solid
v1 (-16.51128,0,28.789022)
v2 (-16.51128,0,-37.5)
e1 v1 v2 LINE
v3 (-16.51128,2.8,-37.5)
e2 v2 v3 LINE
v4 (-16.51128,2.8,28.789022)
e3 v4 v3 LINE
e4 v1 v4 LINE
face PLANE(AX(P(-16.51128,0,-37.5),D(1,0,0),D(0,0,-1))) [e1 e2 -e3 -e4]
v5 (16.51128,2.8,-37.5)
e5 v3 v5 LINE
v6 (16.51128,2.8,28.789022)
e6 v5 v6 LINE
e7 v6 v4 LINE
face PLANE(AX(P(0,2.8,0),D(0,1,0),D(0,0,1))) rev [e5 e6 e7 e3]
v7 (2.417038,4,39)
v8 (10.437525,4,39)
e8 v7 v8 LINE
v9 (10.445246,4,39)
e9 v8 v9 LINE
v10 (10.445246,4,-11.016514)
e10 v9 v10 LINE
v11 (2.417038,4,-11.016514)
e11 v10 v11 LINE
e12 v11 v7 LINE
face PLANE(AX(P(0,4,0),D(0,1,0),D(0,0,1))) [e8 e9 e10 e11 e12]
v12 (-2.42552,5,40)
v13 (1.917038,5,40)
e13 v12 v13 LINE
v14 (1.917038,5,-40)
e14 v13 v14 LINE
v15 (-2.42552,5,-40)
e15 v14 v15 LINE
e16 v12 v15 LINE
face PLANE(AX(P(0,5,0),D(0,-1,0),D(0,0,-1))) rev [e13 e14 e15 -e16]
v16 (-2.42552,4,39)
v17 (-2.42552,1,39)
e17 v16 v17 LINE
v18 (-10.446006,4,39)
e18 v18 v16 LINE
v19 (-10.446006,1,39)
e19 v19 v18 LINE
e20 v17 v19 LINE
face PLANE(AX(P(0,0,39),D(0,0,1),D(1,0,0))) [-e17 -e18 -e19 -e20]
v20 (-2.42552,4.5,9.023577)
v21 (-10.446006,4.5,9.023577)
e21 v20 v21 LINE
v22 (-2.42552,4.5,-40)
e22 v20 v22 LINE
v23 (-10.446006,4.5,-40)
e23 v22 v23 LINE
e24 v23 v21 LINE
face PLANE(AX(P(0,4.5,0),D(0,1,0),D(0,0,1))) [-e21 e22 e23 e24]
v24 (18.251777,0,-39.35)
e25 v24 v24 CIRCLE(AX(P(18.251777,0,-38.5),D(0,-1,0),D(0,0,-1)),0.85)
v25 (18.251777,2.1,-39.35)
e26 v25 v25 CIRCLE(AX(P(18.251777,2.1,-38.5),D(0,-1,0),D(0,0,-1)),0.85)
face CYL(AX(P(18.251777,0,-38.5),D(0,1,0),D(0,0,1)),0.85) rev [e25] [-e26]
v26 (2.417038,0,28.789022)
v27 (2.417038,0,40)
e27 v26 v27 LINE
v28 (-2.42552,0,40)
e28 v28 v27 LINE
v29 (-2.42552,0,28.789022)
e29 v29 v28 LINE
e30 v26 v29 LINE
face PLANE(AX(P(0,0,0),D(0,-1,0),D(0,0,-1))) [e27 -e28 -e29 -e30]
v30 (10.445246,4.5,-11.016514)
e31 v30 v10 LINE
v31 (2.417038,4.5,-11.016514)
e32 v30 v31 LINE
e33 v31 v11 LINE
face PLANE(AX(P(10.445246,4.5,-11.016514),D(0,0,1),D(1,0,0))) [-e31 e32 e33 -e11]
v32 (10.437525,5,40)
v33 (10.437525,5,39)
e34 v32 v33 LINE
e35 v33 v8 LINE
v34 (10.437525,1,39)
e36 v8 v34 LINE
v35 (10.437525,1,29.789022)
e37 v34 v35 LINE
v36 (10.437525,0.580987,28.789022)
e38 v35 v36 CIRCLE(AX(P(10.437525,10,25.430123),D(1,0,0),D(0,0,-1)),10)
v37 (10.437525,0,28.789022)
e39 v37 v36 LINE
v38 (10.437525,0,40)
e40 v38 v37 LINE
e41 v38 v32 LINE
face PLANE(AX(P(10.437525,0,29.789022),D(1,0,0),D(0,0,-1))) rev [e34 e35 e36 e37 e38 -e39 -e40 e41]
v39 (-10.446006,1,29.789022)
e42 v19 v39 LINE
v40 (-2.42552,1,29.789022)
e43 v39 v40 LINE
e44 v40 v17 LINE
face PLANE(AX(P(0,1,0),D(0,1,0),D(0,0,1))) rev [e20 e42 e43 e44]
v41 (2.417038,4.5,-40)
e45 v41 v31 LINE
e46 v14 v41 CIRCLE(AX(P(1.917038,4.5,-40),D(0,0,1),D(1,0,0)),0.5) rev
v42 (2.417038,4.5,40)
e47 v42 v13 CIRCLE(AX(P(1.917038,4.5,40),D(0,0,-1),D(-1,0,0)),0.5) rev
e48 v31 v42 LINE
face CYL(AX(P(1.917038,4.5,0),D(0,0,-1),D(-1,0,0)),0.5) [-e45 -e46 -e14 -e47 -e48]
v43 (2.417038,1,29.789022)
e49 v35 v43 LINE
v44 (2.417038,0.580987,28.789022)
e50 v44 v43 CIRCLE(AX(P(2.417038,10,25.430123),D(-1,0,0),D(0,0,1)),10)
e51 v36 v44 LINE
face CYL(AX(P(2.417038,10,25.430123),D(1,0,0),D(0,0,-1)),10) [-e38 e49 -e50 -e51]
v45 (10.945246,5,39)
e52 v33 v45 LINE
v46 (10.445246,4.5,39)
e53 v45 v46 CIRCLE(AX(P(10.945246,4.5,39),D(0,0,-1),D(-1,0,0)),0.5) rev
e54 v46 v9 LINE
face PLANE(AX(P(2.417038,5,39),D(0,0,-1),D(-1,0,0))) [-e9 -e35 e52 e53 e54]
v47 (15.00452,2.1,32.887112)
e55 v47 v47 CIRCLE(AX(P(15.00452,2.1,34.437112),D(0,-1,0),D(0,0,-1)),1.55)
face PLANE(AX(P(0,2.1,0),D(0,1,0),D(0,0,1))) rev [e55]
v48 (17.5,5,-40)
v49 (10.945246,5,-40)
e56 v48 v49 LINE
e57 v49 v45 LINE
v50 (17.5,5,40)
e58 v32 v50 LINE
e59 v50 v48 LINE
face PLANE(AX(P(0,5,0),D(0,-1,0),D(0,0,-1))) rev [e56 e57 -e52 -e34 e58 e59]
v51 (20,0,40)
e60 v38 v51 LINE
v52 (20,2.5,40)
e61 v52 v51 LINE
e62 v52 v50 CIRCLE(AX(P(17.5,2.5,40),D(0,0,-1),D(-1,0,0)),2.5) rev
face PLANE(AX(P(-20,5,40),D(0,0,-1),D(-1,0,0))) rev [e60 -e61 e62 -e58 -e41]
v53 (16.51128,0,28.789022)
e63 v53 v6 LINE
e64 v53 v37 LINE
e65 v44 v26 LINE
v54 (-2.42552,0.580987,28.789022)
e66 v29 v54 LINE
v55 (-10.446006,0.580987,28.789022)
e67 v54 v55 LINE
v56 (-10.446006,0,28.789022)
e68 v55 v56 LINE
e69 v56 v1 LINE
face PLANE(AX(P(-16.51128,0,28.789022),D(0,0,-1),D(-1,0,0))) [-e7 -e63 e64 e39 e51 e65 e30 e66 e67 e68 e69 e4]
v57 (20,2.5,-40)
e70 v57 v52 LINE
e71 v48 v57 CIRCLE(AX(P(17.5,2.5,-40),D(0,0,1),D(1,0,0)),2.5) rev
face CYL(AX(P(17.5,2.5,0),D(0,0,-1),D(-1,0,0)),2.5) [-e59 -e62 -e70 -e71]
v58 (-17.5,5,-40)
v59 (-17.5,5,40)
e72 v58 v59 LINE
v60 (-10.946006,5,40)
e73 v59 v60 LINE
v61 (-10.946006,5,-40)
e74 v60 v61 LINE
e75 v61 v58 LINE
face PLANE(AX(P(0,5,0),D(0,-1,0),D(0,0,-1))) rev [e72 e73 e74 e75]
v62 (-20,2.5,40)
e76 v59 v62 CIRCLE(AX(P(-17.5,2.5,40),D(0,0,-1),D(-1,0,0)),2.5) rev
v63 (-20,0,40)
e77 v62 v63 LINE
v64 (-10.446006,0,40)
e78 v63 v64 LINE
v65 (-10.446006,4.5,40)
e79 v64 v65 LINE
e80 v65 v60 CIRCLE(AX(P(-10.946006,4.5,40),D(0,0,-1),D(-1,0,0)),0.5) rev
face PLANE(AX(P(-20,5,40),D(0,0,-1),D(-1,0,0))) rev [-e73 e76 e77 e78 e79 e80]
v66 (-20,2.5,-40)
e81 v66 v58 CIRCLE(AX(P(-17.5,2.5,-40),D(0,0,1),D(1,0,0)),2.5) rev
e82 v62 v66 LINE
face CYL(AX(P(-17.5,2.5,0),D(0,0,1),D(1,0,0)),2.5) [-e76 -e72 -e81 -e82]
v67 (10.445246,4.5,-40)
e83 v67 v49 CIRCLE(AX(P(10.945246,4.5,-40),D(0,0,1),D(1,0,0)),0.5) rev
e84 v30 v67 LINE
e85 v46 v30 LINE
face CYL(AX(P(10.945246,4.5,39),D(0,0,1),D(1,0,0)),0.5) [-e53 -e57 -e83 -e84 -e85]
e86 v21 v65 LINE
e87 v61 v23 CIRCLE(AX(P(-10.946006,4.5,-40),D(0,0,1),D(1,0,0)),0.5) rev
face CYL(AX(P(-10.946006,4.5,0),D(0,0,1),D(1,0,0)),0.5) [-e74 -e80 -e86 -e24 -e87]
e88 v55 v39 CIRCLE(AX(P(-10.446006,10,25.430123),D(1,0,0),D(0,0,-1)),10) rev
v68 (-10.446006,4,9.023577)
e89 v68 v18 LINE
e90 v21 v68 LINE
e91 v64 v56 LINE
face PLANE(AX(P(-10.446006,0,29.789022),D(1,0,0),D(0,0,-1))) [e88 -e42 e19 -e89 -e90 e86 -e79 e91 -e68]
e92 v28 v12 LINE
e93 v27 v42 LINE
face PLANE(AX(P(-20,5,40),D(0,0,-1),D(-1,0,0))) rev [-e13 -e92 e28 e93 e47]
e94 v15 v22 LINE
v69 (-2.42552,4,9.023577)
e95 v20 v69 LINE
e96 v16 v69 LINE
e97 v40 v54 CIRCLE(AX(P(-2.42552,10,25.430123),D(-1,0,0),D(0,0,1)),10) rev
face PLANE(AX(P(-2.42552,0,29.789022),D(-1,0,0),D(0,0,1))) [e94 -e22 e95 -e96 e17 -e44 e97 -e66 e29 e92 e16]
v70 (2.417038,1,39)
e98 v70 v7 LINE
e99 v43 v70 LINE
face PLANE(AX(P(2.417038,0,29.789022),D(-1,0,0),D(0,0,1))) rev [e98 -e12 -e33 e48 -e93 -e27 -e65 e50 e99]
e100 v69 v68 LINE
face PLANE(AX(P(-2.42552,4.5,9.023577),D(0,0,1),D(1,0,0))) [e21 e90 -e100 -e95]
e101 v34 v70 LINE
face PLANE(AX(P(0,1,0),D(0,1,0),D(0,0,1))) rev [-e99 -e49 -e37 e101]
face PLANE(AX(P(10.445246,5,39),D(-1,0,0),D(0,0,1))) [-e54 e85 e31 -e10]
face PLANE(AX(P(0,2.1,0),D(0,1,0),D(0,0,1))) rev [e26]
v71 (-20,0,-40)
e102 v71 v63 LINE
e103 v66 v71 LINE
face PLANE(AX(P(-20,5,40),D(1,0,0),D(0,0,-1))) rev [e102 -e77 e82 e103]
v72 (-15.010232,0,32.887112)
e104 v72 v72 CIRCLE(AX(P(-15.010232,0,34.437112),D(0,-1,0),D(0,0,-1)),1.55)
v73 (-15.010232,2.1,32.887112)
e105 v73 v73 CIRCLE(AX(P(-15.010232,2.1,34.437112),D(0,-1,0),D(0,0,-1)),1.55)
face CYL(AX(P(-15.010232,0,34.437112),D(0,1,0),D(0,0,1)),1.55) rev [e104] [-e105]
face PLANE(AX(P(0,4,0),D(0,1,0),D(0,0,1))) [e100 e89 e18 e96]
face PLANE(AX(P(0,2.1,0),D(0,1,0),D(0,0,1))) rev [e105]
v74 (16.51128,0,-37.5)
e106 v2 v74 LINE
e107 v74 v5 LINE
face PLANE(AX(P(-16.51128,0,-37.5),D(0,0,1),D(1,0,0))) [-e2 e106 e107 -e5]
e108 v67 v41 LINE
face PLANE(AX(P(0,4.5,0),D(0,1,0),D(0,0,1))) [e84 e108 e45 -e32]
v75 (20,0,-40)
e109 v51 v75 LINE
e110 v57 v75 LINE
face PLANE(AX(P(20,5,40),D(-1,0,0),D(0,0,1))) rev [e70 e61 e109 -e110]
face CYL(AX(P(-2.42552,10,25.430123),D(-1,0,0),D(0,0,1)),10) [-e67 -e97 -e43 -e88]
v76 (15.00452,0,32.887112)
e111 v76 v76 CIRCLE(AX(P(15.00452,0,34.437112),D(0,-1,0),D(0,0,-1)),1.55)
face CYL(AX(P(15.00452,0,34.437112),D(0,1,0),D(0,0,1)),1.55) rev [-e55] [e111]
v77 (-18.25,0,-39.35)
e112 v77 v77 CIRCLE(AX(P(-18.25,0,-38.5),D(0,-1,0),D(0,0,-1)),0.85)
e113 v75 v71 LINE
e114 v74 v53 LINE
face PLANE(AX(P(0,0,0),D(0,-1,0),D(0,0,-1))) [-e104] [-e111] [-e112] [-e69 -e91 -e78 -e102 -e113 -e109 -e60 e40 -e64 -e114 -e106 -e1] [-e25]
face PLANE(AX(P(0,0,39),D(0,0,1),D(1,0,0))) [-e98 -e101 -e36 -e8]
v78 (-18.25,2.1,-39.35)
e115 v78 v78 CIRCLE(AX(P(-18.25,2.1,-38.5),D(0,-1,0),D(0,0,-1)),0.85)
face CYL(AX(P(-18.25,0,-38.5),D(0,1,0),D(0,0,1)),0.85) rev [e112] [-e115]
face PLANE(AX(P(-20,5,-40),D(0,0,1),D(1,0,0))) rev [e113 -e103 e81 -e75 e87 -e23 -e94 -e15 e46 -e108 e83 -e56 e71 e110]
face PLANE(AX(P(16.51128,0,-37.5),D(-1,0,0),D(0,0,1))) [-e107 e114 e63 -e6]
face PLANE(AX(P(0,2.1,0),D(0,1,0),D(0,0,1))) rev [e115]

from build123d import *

# Parameters (mm, degrees)
SKETCH2_W           = 40
SKETCH2_H           = 80
BOSS_EXTRUDE1_DEPTH = 5
CUT_EXTRUDE1_DEPTH  = 2.8000000000000003
CUT_EXTRUDE2_DEPTH  = 1
CUT_EXTRUDE3_DEPTH  = 1
CUT_EXTRUDE4_DEPTH  = 0.5
CUT_EXTRUDE5_DEPTH  = 0.5
FILLET1_R           = 0.5
FILLET2_R           = 2.5
F_3DSKETCH6_R       = 1.5500000000000003
F_3DSKETCH6_R_2     = 0.8500000000000008
CUT_EXTRUDE6_DEPTH  = 2.1
FILLET3_START       = -10.446006344
FILLET3_DEPTH       = 8.020486493
FILLET3_START_2     = 2.417038032
FILLET3_2_DEPTH     = 8.020486493


with BuildPart() as part:
    # Sketch2 → Boss-Extrude1 (new body)
    with BuildSketch(Plane(origin=(0, 0, 0), x_dir=(1, 0, 0), z_dir=(0, 1, 0))):
        Rectangle(SKETCH2_W, SKETCH2_H)
    extrude(amount=BOSS_EXTRUDE1_DEPTH)

    # 3DSketch1 → Cut-Extrude1 (cut)
    with BuildSketch(Plane(origin=(-16.51128006150057, 0, -37.5), x_dir=(0.4458957716594368, 0, 0.8950848902848463), z_dir=(0, 1, 0))):
        Polygon((0, 0), (14.72461992821574, 29.557994604621218), (74.05892188684597, 0), (59.334301958630235, -29.557994604621218), align=None)
    extrude(amount=CUT_EXTRUDE1_DEPTH, mode=Mode.SUBTRACT)

    # 3DSketch2 → Cut-Extrude2 (cut)
    with BuildSketch(Plane(origin=(2.4170380320342884, 0, 29.789021971701544), x_dir=(-0.7832232950206466, 0, 0.621740516724623), z_dir=(0, 1, 0))):
        Polygon((0, 0), (-6.28183185870911, 4.986661416535171), (0.06674689686894317, 12.984137273242512), (6.348578755578054, 7.997475856707341), align=None)
        Polygon((3.7928041411073767, -3.0108144401721697), (10.074635999816486, -7.997475856707341), (16.42321475539454, 0), (10.14138289668543, 4.986661416535171), align=None)
    extrude(amount=CUT_EXTRUDE2_DEPTH, mode=Mode.SUBTRACT)

    # 3DSketch3 → Cut-Extrude3 (cut)
    with BuildSketch(Plane(origin=(2.4170380320342884, 1, 40), x_dir=(-0.9548954301559858, 0.29694227968953, 0), z_dir=(0, 0, -1))):
        Polygon((0, 0), (-7.658725899785049, 2.3816215434478725), (-6.470956781026929, 6.2012032640718155), (1.1877691187581199, 3.8195817206239426), align=None)
        Polygon((12.282862292108083, -3.8195817206239426), (4.6241363923230345, -1.43796017717607), (5.811905511081154, 2.381621543447873), (13.470631410866202, 0), align=None)
    extrude(amount=CUT_EXTRUDE3_DEPTH, mode=Mode.SUBTRACT)

    # 3DSketch4 → Cut-Extrude4 (cut)
    with BuildSketch(Plane(origin=(-10.446006343517528, 5, 39), x_dir=(0.25565796932804924, 0, -0.9667672950193641), z_dir=(0, 1, 0))):
        Polygon((0, 0), (76.37461630652976, 20.19697957691589), (78.42511759635093, 12.443035545347499), (2.0505012898211623, -7.753944031568391), align=None)
        Polygon((3.288539804430162, -12.435570616666274), (79.66315611095993, 7.761408960249617), (81.71563147305025, 0), (5.341015166520477, -20.19697957691589), align=None)
    extrude(amount=-CUT_EXTRUDE4_DEPTH, mode=Mode.SUBTRACT)

    # 3DSketch5 → Cut-Extrude5 (cut)
    with BuildSketch(Plane(origin=(10.445246061241729, 4.500000000000001, -11.016513850599985), x_dir=(-0.3854175434043051, 0, 0.9227422810493678), z_dir=(0, 1, 0))):
        Polygon((0, 0), (3.0942122165558494, -7.407966989609723), (49.24656429719578, 11.869274908335926), (46.152352080639936, 19.27724189794565), align=None)
        Polygon((23.45245782033335, -4.152597437612319), (26.543694021369404, -11.553439439280611), (54.20420726112153, 0), (51.11297106008547, 7.400842001668292), align=None)
    extrude(amount=-CUT_EXTRUDE5_DEPTH, mode=Mode.SUBTRACT)

    # Fillet1
    fillet1_edges = [part.edges().sort_by_distance(p)[0] for p in [
        (-10.446006343517528, 5, 7.11e-15),
        (2.4170380320342884, 5, 0),
        (10.445246061241729, 5, -0.5000000000000071),
    ]]
    fillet(fillet1_edges, radius=FILLET1_R)

    # Fillet2
    fillet2_edges = [part.edges().sort_by_distance(p)[0] for p in [
        (-20, 5, 0),
        (20, 5, 0),
    ]]
    fillet(fillet2_edges, radius=FILLET2_R)

    # 3DSketch6 → Cut-Extrude6 (cut)
    with BuildSketch(Plane(origin=(15.004520440934186, 0, 34.437112055137284), x_dir=(-0.41484987007197305, 0, -0.909889875370238), z_dir=(0, -1, 0))):
        with Locations(Location((0, 0, 0), (0, 0, 24.509862444))):
            Circle(F_3DSKETCH6_R)
        with Locations(Location((12.4516160827032, -27.310119209349818, 0), (0, 0, 24.509862444))):
            Circle(F_3DSKETCH6_R)
        with Locations(Location((80.16037328194126, 0, 0), (0, 0, 24.509862444))):
            Circle(F_3DSKETCH6_R_2)
        with Locations(Location((65.01761603264471, 33.2125968942302, 0), (0, 0, 24.509862444))):
            Circle(F_3DSKETCH6_R_2)
    extrude(amount=-CUT_EXTRUDE6_DEPTH, mode=Mode.SUBTRACT)

    # Fillet3: read off the stored shape, not the designer's step
    # Fillet3 outline → Fillet3 (cut)
    with BuildSketch(Plane.YZ.offset(FILLET3_START)):
        with BuildLine():
            Line((0, 28.789021972), (0.580987425, 28.789021972))
            ThreePointArc((0.580987425, 28.789021972), (0.776930768, 29.294705016), (1, 29.789021972))
            Line((1, 29.789021972), (0, 29.789021972))
            Line((0, 29.789021972), (0, 28.789021972))
        make_face()
    extrude(amount=FILLET3_DEPTH, mode=Mode.SUBTRACT)

    # Fillet3 2 outline → Fillet3 2 (cut)
    with BuildSketch(Plane.YZ.offset(FILLET3_START_2)):
        with BuildLine():
            Line((0, 28.789021972), (0.580987425, 28.789021972))
            ThreePointArc((0.580987425, 28.789021972), (0.776930768, 29.294705016), (1, 29.789021972))
            Line((1, 29.789021972), (0, 29.789021972))
            Line((0, 29.789021972), (0, 28.789021972))
        make_face()
    extrude(amount=FILLET3_2_DEPTH, mode=Mode.SUBTRACT)


solid = part.part
